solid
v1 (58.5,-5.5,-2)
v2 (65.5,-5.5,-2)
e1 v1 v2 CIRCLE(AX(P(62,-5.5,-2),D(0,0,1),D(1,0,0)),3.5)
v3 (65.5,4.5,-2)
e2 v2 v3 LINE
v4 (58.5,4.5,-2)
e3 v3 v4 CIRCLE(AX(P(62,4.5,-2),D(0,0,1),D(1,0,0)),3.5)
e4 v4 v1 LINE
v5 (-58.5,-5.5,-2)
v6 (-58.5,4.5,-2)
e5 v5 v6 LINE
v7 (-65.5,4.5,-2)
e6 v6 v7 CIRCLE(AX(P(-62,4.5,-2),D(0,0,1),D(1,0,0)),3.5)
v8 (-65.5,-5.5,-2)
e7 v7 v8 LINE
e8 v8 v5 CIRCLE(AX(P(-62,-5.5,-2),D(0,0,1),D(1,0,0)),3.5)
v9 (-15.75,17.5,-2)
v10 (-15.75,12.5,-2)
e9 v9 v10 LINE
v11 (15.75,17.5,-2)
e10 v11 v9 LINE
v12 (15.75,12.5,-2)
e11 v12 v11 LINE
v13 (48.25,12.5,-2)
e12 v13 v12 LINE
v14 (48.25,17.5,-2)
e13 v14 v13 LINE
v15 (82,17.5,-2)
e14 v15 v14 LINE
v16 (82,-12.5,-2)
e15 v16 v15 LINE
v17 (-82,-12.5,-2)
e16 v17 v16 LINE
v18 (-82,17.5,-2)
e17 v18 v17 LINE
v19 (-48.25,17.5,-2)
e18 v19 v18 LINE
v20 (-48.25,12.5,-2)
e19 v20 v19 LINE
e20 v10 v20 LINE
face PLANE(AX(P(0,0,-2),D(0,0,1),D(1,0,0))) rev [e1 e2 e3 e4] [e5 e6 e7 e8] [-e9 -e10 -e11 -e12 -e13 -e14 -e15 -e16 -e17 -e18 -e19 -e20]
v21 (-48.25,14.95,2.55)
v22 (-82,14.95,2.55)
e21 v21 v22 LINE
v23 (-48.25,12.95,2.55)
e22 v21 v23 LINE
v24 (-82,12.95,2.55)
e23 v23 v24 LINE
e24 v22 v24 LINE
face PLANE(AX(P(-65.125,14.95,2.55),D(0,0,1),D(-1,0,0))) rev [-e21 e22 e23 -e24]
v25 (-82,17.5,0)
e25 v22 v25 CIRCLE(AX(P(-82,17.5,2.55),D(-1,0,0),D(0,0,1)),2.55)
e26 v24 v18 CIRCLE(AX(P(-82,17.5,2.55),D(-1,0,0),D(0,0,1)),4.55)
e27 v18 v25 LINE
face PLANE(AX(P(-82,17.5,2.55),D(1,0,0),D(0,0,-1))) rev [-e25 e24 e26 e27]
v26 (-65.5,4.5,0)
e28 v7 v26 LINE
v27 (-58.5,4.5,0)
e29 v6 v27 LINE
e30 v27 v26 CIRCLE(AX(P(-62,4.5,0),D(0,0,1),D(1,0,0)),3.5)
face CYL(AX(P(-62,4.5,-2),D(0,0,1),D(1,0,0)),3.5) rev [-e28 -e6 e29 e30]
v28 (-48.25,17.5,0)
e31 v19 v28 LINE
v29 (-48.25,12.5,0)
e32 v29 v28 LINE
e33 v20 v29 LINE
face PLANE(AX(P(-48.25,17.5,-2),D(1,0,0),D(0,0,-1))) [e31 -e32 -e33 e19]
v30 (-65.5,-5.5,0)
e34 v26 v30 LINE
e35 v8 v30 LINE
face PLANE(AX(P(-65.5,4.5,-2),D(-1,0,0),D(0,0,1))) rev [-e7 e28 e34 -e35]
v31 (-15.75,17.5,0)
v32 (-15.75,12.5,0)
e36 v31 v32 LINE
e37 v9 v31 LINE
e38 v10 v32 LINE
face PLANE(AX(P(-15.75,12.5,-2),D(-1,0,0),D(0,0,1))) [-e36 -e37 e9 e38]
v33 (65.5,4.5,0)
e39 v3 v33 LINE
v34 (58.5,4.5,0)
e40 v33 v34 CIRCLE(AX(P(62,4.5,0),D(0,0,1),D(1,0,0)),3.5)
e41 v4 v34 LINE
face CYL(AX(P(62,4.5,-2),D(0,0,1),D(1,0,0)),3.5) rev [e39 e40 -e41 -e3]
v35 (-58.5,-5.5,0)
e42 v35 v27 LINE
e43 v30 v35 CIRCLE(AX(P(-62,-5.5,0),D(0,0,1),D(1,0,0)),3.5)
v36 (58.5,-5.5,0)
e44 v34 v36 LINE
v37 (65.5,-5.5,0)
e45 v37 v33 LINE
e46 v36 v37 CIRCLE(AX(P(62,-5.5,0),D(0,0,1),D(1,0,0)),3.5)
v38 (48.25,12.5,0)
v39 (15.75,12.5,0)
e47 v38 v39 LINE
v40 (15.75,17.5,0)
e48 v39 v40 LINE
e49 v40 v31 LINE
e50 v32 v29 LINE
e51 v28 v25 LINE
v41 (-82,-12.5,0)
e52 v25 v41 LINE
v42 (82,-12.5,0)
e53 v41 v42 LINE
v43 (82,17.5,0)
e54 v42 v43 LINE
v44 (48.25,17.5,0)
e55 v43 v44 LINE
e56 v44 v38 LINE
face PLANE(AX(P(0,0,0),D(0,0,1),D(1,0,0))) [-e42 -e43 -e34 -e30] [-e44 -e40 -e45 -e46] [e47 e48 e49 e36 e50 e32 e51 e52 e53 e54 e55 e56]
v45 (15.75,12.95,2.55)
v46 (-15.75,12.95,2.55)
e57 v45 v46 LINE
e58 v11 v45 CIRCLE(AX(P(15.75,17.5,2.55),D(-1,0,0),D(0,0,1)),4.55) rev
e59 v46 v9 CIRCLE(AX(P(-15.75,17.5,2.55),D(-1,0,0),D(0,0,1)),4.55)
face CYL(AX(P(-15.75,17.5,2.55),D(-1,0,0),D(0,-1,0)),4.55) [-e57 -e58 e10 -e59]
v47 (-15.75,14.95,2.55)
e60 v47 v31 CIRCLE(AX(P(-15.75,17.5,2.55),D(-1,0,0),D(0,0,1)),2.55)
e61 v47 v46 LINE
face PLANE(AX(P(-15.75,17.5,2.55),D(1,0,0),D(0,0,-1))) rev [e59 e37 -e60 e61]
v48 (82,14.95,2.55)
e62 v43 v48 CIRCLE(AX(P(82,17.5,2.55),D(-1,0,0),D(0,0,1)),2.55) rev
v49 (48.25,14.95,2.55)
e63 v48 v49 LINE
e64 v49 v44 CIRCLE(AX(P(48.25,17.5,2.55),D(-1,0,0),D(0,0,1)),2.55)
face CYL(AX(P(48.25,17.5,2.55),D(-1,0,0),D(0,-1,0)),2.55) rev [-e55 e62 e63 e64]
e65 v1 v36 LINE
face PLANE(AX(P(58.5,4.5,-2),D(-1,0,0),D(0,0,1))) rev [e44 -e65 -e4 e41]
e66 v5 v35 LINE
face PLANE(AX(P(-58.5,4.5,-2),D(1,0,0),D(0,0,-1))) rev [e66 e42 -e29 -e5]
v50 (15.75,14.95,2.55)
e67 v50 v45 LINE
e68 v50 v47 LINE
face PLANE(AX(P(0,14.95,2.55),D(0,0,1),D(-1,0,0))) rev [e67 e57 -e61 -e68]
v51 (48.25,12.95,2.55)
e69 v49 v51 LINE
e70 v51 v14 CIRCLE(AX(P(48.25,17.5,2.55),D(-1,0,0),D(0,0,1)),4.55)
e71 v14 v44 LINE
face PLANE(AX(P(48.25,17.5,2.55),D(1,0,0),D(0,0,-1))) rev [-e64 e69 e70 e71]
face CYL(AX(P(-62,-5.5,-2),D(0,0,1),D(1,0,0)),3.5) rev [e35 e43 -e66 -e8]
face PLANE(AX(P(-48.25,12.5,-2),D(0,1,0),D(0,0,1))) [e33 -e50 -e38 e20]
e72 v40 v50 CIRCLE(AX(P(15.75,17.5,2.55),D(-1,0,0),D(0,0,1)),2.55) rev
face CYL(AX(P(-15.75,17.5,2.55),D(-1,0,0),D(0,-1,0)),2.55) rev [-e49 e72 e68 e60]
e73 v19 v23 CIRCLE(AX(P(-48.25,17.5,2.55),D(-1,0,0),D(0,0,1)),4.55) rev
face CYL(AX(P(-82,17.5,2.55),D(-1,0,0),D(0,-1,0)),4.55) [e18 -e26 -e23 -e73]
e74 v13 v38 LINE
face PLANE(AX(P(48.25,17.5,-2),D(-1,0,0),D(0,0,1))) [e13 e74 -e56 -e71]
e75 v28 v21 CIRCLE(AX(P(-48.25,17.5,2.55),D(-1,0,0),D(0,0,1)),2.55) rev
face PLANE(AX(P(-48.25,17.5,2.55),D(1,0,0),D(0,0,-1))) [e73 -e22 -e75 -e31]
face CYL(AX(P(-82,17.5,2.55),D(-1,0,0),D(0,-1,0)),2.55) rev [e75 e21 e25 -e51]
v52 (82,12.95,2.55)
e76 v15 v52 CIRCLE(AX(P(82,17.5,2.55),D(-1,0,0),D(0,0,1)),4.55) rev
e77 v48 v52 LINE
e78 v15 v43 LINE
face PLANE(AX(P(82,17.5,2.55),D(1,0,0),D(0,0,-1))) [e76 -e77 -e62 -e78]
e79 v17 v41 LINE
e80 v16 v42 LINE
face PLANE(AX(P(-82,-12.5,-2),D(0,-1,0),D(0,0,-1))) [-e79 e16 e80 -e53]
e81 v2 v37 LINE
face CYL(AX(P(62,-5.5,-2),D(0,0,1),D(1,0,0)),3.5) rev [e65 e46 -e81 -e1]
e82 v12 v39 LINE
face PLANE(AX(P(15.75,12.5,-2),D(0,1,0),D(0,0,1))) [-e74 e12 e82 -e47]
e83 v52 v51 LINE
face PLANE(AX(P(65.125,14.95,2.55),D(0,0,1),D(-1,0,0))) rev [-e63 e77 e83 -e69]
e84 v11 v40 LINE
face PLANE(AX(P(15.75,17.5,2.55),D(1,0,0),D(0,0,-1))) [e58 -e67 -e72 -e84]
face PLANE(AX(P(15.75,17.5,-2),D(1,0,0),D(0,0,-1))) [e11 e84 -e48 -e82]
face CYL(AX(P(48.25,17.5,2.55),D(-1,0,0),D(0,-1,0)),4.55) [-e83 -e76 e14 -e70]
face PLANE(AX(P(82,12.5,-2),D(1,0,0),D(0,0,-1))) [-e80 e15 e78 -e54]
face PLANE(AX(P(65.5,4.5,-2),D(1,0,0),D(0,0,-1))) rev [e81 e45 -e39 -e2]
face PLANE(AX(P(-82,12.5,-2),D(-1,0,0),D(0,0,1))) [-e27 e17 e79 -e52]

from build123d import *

# Parameters (mm, degrees)
BASIS_BLECH1_DEPTH       = 2
BLECHKANTENRAND1_START   = -82
BLECHKANTENRAND1_DEPTH   = 33.75
BLECHKANTENRAND1_START_2 = 48.25
BLECHKANTENRAND1_2_DEPTH = 33.75
BLECHKANTENRAND1_START_3 = -15.75
BLECHKANTENRAND1_3_DEPTH = 31.5


# Read off the part's stored shape, not the designer's step: Blechkantenrand1
# Sheet-metal steps are written as plain solids
with BuildPart() as part:
    # Skizze1 → Basis-Blech1 (new body)
    with BuildSketch(Plane.XY):
        Polygon((-82, 12.5), (-82, 17.5), (-48.25, 17.5), (-48.25, 12.5), (-15.75, 12.5), (-15.75, 17.5), (15.75, 17.5), (15.75, 12.5), (48.25, 12.5), (48.25, 17.5), (82, 17.5), (82, 12.5), (82, -12.5), (-82, -12.5), align=None)
        with BuildLine():
            Line((-58.5, 4.5), (-58.5, -5.5))
            ThreePointArc((-58.5, -5.5), (-62, -9), (-65.5, -5.5))
            Line((-65.5, -5.5), (-65.5, 4.5))
            ThreePointArc((-65.5, 4.5), (-62, 8), (-58.5, 4.5))
        make_face(mode=Mode.SUBTRACT)
        with BuildLine():
            Line((65.5, 4.5), (65.5, -5.5))
            ThreePointArc((65.5, -5.5), (62, -9), (58.5, -5.5))
            Line((58.5, -5.5), (58.5, 4.5))
            ThreePointArc((58.5, 4.5), (62, 8), (65.5, 4.5))
        make_face(mode=Mode.SUBTRACT)
    extrude(amount=-BASIS_BLECH1_DEPTH)

    # Blechkantenrand1 outline → Blechkantenrand1 (add)
    with BuildSketch(Plane.YZ.offset(BLECHKANTENRAND1_START)):
        with BuildLine():
            Line((12.95, 2.55), (14.95, 2.55))
            ThreePointArc((14.95, 2.55), (19.303122292, 4.353122292), (17.5, 0))
            Line((17.5, 0), (17.5, -2))
            ThreePointArc((17.5, -2), (20.717335854, 5.767335854), (12.95, 2.55))
        make_face()
    extrude(amount=BLECHKANTENRAND1_DEPTH)

    # Blechkantenrand1 2 outline → Blechkantenrand1 2 (add)
    with BuildSketch(Plane.YZ.offset(BLECHKANTENRAND1_START_2)):
        with BuildLine():
            Line((12.95, 2.55), (14.95, 2.55))
            ThreePointArc((14.95, 2.55), (19.303122292, 4.353122292), (17.5, 0))
            Line((17.5, 0), (17.5, -2))
            ThreePointArc((17.5, -2), (20.717335854, 5.767335854), (12.95, 2.55))
        make_face()
    extrude(amount=BLECHKANTENRAND1_2_DEPTH)

    # Blechkantenrand1 3 outline → Blechkantenrand1 3 (add)
    with BuildSketch(Plane.YZ.offset(BLECHKANTENRAND1_START_3)):
        with BuildLine():
            Line((12.95, 2.55), (14.95, 2.55))
            ThreePointArc((14.95, 2.55), (19.303122292, 4.353122292), (17.5, 0))
            Line((17.5, 0), (17.5, -2))
            ThreePointArc((17.5, -2), (20.717335854, 5.767335854), (12.95, 2.55))
        make_face()
    extrude(amount=BLECHKANTENRAND1_3_DEPTH)


solid = part.part
